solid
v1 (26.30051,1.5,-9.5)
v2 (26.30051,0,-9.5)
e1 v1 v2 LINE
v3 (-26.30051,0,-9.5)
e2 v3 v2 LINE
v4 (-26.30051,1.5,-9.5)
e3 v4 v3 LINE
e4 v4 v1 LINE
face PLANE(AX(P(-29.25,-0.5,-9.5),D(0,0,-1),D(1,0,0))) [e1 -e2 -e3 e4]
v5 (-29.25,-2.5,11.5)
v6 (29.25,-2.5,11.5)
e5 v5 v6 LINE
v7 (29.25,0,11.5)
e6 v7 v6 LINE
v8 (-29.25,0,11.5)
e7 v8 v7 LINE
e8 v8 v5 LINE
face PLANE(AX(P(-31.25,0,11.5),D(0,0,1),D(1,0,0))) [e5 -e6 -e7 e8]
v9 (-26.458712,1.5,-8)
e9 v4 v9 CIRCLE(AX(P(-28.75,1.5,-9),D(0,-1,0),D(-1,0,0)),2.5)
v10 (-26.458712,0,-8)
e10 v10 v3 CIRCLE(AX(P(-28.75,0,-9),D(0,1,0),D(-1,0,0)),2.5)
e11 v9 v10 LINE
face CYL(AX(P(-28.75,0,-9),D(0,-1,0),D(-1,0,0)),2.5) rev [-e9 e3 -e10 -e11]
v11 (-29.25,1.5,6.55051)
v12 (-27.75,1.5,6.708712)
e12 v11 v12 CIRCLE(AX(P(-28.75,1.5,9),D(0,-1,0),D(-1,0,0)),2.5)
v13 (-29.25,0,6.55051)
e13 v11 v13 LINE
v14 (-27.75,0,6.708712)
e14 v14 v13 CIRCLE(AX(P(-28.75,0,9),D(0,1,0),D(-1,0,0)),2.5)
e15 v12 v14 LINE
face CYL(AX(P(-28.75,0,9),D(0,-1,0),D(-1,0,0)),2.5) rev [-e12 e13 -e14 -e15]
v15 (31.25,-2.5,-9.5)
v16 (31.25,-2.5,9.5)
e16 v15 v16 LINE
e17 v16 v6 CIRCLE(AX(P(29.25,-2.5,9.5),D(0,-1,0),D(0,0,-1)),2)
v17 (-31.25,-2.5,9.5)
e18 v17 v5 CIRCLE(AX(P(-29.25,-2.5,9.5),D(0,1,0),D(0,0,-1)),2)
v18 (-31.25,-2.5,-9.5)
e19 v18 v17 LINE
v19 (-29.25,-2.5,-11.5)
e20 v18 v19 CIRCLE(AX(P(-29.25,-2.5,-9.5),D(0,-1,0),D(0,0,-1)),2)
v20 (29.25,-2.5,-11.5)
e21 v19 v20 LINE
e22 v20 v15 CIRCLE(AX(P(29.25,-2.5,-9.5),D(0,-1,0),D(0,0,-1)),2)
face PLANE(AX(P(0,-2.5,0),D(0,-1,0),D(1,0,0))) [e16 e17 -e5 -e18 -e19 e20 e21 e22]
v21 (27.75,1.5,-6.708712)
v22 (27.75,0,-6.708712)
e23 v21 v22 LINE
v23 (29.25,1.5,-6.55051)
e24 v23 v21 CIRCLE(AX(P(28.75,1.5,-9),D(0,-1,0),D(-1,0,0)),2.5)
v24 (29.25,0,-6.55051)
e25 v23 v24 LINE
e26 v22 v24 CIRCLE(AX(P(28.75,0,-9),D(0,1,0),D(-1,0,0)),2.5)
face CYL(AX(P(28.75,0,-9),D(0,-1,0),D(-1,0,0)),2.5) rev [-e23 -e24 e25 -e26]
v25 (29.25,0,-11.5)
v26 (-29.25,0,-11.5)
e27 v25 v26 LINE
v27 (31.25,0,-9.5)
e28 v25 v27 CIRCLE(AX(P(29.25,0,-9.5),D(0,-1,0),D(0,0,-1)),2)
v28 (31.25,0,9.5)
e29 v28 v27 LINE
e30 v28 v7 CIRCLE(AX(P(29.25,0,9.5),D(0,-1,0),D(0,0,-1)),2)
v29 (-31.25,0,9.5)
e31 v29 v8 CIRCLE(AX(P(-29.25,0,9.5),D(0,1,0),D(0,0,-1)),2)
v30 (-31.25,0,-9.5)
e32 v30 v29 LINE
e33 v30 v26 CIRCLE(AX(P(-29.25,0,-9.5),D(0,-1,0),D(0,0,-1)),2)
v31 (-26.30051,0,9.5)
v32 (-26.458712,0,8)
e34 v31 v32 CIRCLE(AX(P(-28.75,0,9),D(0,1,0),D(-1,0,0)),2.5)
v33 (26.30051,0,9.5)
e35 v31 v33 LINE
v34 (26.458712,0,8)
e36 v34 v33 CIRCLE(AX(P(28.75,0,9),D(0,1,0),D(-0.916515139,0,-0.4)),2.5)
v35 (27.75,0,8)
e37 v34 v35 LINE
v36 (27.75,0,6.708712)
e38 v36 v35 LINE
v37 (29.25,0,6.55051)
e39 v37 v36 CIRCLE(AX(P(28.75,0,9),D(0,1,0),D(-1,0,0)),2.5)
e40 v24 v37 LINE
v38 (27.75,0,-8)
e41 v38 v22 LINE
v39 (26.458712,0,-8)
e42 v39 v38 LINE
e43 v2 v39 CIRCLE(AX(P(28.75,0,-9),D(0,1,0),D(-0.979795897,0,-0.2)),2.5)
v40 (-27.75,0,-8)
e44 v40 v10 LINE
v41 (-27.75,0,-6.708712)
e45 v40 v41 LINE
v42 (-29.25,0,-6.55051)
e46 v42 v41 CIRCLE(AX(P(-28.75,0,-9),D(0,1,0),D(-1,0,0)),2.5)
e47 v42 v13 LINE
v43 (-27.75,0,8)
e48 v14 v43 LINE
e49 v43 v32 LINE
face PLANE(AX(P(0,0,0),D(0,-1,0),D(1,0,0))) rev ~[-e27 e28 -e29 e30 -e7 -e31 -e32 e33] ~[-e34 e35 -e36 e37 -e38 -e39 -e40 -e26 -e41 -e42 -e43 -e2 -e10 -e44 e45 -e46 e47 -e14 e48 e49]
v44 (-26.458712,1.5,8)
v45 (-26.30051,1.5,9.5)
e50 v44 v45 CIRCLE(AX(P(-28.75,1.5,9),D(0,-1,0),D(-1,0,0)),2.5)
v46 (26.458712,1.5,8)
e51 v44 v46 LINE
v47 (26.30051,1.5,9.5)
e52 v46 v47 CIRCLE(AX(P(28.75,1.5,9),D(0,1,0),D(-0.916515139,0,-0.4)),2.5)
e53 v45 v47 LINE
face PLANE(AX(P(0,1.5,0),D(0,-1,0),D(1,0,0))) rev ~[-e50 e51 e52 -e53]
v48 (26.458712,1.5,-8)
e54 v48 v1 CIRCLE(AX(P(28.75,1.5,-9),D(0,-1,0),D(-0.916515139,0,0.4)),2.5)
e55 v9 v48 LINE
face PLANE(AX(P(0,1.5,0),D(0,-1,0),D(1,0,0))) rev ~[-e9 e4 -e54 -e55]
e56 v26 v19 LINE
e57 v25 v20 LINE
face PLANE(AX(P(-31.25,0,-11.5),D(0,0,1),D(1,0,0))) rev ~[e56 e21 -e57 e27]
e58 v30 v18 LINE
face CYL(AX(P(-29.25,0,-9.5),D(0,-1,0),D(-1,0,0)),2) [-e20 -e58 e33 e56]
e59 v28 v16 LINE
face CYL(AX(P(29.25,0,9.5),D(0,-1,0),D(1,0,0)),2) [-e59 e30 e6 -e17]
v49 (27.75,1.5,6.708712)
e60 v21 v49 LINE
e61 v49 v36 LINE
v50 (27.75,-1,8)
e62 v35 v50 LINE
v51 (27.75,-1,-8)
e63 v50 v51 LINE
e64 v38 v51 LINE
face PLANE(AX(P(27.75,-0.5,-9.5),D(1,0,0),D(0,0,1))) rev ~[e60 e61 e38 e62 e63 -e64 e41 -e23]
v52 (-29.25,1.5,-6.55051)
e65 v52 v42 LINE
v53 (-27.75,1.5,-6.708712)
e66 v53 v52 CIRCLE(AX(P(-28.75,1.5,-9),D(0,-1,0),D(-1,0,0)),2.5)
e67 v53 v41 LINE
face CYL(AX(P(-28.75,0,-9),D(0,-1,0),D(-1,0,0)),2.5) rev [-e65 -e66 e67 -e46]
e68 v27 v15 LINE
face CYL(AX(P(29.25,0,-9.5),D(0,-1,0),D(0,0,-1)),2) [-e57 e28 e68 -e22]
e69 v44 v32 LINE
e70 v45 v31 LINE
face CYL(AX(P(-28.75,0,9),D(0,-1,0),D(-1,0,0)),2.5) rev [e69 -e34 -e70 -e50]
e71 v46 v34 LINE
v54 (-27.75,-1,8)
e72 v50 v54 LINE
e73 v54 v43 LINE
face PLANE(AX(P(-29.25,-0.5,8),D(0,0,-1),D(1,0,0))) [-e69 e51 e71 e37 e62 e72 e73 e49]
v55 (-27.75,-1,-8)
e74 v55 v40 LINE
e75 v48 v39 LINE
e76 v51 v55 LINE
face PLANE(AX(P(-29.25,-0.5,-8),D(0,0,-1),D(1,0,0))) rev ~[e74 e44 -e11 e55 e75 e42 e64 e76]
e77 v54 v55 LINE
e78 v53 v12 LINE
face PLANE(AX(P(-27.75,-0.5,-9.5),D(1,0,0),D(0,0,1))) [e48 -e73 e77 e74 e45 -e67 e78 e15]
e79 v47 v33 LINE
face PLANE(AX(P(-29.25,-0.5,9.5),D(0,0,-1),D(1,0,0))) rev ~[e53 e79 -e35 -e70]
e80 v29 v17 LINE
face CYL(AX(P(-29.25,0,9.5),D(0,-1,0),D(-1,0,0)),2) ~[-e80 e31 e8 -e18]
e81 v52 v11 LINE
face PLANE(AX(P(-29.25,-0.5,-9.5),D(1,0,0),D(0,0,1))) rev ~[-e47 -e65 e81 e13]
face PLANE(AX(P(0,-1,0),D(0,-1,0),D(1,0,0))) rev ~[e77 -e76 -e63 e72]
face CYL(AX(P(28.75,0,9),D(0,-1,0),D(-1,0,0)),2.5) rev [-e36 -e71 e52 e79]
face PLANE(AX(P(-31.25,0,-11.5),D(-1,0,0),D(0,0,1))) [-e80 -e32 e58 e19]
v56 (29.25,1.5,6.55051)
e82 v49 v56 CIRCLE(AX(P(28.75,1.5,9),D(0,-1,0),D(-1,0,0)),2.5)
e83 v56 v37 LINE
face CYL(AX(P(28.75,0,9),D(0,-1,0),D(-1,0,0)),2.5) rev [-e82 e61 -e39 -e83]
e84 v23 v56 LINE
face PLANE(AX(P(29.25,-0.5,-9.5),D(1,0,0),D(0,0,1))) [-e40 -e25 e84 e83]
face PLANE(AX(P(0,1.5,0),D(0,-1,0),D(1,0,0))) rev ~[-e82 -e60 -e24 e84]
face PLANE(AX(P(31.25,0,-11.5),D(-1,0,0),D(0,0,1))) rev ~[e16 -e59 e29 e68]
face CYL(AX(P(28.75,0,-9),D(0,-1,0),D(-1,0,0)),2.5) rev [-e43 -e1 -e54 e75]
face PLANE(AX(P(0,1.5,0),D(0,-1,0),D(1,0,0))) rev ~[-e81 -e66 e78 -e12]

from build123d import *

# Parameters (mm, degrees)
F0_W     = 62.5
F0_H     = 23
F1_DEPTH = 2.5
F2_T     = -2
F3_R     = 2
F4_DEPTH = 2
F5_T     = -1.5
F6_R     = 2.5
F7_DEPTH = 2


# Not quite as in the source:
# - a feature names something its author has since deleted; it is built from what else it names


with BuildPart() as f1:
    # F0 (on Front) → F1 (new body)
    with BuildSketch(Plane.XZ):
        Rectangle(F0_W, F0_H)
    extrude(amount=F1_DEPTH)

    # F2
    f2_openings = [f1.faces().sort_by_distance(p)[0] for p in [
        (0, 0, 0),
    ]]
    offset(amount=F2_T, openings=f2_openings)

    # F3
    f3_edges = [f1.edges().sort_by_distance(p)[0] for p in [
        (-31.25, -1.25, 11.5),
        (-31.25, -1.25, -11.5),
        (31.25, -1.25, 11.5),
        (31.25, -1.25, -11.5),
    ]]
    fillet(f3_edges, radius=F3_R)

    # F4 (add): a face of the model
    f4_faces = [f1.faces().sort_by_distance(p)[0] for p in [
        (0, -0.5, 0),
    ]]
    extrude(f4_faces, amount=F4_DEPTH)

    # F5
    f5_openings = [f1.faces().sort_by_distance(p)[0] for p in [
        (0, 1.5, 0),
    ]]
    offset(amount=F5_T, openings=f5_openings, kind=Kind.INTERSECTION)

    # F6 (on face) → F7 (cut)
    with BuildSketch(Plane(origin=(0, 0, 0), x_dir=(-1, 0, 0), z_dir=(0, 1, 0))):
        with Locations((-28.75, 9)):
            Circle(F6_R)
        with Locations((28.75, 9)):
            Circle(F6_R)
        with Locations((28.75, -9)):
            Circle(F6_R)
        with Locations((-28.75, -9)):
            Circle(F6_R)
    extrude(amount=F7_DEPTH, mode=Mode.SUBTRACT)


solid = f1.part
